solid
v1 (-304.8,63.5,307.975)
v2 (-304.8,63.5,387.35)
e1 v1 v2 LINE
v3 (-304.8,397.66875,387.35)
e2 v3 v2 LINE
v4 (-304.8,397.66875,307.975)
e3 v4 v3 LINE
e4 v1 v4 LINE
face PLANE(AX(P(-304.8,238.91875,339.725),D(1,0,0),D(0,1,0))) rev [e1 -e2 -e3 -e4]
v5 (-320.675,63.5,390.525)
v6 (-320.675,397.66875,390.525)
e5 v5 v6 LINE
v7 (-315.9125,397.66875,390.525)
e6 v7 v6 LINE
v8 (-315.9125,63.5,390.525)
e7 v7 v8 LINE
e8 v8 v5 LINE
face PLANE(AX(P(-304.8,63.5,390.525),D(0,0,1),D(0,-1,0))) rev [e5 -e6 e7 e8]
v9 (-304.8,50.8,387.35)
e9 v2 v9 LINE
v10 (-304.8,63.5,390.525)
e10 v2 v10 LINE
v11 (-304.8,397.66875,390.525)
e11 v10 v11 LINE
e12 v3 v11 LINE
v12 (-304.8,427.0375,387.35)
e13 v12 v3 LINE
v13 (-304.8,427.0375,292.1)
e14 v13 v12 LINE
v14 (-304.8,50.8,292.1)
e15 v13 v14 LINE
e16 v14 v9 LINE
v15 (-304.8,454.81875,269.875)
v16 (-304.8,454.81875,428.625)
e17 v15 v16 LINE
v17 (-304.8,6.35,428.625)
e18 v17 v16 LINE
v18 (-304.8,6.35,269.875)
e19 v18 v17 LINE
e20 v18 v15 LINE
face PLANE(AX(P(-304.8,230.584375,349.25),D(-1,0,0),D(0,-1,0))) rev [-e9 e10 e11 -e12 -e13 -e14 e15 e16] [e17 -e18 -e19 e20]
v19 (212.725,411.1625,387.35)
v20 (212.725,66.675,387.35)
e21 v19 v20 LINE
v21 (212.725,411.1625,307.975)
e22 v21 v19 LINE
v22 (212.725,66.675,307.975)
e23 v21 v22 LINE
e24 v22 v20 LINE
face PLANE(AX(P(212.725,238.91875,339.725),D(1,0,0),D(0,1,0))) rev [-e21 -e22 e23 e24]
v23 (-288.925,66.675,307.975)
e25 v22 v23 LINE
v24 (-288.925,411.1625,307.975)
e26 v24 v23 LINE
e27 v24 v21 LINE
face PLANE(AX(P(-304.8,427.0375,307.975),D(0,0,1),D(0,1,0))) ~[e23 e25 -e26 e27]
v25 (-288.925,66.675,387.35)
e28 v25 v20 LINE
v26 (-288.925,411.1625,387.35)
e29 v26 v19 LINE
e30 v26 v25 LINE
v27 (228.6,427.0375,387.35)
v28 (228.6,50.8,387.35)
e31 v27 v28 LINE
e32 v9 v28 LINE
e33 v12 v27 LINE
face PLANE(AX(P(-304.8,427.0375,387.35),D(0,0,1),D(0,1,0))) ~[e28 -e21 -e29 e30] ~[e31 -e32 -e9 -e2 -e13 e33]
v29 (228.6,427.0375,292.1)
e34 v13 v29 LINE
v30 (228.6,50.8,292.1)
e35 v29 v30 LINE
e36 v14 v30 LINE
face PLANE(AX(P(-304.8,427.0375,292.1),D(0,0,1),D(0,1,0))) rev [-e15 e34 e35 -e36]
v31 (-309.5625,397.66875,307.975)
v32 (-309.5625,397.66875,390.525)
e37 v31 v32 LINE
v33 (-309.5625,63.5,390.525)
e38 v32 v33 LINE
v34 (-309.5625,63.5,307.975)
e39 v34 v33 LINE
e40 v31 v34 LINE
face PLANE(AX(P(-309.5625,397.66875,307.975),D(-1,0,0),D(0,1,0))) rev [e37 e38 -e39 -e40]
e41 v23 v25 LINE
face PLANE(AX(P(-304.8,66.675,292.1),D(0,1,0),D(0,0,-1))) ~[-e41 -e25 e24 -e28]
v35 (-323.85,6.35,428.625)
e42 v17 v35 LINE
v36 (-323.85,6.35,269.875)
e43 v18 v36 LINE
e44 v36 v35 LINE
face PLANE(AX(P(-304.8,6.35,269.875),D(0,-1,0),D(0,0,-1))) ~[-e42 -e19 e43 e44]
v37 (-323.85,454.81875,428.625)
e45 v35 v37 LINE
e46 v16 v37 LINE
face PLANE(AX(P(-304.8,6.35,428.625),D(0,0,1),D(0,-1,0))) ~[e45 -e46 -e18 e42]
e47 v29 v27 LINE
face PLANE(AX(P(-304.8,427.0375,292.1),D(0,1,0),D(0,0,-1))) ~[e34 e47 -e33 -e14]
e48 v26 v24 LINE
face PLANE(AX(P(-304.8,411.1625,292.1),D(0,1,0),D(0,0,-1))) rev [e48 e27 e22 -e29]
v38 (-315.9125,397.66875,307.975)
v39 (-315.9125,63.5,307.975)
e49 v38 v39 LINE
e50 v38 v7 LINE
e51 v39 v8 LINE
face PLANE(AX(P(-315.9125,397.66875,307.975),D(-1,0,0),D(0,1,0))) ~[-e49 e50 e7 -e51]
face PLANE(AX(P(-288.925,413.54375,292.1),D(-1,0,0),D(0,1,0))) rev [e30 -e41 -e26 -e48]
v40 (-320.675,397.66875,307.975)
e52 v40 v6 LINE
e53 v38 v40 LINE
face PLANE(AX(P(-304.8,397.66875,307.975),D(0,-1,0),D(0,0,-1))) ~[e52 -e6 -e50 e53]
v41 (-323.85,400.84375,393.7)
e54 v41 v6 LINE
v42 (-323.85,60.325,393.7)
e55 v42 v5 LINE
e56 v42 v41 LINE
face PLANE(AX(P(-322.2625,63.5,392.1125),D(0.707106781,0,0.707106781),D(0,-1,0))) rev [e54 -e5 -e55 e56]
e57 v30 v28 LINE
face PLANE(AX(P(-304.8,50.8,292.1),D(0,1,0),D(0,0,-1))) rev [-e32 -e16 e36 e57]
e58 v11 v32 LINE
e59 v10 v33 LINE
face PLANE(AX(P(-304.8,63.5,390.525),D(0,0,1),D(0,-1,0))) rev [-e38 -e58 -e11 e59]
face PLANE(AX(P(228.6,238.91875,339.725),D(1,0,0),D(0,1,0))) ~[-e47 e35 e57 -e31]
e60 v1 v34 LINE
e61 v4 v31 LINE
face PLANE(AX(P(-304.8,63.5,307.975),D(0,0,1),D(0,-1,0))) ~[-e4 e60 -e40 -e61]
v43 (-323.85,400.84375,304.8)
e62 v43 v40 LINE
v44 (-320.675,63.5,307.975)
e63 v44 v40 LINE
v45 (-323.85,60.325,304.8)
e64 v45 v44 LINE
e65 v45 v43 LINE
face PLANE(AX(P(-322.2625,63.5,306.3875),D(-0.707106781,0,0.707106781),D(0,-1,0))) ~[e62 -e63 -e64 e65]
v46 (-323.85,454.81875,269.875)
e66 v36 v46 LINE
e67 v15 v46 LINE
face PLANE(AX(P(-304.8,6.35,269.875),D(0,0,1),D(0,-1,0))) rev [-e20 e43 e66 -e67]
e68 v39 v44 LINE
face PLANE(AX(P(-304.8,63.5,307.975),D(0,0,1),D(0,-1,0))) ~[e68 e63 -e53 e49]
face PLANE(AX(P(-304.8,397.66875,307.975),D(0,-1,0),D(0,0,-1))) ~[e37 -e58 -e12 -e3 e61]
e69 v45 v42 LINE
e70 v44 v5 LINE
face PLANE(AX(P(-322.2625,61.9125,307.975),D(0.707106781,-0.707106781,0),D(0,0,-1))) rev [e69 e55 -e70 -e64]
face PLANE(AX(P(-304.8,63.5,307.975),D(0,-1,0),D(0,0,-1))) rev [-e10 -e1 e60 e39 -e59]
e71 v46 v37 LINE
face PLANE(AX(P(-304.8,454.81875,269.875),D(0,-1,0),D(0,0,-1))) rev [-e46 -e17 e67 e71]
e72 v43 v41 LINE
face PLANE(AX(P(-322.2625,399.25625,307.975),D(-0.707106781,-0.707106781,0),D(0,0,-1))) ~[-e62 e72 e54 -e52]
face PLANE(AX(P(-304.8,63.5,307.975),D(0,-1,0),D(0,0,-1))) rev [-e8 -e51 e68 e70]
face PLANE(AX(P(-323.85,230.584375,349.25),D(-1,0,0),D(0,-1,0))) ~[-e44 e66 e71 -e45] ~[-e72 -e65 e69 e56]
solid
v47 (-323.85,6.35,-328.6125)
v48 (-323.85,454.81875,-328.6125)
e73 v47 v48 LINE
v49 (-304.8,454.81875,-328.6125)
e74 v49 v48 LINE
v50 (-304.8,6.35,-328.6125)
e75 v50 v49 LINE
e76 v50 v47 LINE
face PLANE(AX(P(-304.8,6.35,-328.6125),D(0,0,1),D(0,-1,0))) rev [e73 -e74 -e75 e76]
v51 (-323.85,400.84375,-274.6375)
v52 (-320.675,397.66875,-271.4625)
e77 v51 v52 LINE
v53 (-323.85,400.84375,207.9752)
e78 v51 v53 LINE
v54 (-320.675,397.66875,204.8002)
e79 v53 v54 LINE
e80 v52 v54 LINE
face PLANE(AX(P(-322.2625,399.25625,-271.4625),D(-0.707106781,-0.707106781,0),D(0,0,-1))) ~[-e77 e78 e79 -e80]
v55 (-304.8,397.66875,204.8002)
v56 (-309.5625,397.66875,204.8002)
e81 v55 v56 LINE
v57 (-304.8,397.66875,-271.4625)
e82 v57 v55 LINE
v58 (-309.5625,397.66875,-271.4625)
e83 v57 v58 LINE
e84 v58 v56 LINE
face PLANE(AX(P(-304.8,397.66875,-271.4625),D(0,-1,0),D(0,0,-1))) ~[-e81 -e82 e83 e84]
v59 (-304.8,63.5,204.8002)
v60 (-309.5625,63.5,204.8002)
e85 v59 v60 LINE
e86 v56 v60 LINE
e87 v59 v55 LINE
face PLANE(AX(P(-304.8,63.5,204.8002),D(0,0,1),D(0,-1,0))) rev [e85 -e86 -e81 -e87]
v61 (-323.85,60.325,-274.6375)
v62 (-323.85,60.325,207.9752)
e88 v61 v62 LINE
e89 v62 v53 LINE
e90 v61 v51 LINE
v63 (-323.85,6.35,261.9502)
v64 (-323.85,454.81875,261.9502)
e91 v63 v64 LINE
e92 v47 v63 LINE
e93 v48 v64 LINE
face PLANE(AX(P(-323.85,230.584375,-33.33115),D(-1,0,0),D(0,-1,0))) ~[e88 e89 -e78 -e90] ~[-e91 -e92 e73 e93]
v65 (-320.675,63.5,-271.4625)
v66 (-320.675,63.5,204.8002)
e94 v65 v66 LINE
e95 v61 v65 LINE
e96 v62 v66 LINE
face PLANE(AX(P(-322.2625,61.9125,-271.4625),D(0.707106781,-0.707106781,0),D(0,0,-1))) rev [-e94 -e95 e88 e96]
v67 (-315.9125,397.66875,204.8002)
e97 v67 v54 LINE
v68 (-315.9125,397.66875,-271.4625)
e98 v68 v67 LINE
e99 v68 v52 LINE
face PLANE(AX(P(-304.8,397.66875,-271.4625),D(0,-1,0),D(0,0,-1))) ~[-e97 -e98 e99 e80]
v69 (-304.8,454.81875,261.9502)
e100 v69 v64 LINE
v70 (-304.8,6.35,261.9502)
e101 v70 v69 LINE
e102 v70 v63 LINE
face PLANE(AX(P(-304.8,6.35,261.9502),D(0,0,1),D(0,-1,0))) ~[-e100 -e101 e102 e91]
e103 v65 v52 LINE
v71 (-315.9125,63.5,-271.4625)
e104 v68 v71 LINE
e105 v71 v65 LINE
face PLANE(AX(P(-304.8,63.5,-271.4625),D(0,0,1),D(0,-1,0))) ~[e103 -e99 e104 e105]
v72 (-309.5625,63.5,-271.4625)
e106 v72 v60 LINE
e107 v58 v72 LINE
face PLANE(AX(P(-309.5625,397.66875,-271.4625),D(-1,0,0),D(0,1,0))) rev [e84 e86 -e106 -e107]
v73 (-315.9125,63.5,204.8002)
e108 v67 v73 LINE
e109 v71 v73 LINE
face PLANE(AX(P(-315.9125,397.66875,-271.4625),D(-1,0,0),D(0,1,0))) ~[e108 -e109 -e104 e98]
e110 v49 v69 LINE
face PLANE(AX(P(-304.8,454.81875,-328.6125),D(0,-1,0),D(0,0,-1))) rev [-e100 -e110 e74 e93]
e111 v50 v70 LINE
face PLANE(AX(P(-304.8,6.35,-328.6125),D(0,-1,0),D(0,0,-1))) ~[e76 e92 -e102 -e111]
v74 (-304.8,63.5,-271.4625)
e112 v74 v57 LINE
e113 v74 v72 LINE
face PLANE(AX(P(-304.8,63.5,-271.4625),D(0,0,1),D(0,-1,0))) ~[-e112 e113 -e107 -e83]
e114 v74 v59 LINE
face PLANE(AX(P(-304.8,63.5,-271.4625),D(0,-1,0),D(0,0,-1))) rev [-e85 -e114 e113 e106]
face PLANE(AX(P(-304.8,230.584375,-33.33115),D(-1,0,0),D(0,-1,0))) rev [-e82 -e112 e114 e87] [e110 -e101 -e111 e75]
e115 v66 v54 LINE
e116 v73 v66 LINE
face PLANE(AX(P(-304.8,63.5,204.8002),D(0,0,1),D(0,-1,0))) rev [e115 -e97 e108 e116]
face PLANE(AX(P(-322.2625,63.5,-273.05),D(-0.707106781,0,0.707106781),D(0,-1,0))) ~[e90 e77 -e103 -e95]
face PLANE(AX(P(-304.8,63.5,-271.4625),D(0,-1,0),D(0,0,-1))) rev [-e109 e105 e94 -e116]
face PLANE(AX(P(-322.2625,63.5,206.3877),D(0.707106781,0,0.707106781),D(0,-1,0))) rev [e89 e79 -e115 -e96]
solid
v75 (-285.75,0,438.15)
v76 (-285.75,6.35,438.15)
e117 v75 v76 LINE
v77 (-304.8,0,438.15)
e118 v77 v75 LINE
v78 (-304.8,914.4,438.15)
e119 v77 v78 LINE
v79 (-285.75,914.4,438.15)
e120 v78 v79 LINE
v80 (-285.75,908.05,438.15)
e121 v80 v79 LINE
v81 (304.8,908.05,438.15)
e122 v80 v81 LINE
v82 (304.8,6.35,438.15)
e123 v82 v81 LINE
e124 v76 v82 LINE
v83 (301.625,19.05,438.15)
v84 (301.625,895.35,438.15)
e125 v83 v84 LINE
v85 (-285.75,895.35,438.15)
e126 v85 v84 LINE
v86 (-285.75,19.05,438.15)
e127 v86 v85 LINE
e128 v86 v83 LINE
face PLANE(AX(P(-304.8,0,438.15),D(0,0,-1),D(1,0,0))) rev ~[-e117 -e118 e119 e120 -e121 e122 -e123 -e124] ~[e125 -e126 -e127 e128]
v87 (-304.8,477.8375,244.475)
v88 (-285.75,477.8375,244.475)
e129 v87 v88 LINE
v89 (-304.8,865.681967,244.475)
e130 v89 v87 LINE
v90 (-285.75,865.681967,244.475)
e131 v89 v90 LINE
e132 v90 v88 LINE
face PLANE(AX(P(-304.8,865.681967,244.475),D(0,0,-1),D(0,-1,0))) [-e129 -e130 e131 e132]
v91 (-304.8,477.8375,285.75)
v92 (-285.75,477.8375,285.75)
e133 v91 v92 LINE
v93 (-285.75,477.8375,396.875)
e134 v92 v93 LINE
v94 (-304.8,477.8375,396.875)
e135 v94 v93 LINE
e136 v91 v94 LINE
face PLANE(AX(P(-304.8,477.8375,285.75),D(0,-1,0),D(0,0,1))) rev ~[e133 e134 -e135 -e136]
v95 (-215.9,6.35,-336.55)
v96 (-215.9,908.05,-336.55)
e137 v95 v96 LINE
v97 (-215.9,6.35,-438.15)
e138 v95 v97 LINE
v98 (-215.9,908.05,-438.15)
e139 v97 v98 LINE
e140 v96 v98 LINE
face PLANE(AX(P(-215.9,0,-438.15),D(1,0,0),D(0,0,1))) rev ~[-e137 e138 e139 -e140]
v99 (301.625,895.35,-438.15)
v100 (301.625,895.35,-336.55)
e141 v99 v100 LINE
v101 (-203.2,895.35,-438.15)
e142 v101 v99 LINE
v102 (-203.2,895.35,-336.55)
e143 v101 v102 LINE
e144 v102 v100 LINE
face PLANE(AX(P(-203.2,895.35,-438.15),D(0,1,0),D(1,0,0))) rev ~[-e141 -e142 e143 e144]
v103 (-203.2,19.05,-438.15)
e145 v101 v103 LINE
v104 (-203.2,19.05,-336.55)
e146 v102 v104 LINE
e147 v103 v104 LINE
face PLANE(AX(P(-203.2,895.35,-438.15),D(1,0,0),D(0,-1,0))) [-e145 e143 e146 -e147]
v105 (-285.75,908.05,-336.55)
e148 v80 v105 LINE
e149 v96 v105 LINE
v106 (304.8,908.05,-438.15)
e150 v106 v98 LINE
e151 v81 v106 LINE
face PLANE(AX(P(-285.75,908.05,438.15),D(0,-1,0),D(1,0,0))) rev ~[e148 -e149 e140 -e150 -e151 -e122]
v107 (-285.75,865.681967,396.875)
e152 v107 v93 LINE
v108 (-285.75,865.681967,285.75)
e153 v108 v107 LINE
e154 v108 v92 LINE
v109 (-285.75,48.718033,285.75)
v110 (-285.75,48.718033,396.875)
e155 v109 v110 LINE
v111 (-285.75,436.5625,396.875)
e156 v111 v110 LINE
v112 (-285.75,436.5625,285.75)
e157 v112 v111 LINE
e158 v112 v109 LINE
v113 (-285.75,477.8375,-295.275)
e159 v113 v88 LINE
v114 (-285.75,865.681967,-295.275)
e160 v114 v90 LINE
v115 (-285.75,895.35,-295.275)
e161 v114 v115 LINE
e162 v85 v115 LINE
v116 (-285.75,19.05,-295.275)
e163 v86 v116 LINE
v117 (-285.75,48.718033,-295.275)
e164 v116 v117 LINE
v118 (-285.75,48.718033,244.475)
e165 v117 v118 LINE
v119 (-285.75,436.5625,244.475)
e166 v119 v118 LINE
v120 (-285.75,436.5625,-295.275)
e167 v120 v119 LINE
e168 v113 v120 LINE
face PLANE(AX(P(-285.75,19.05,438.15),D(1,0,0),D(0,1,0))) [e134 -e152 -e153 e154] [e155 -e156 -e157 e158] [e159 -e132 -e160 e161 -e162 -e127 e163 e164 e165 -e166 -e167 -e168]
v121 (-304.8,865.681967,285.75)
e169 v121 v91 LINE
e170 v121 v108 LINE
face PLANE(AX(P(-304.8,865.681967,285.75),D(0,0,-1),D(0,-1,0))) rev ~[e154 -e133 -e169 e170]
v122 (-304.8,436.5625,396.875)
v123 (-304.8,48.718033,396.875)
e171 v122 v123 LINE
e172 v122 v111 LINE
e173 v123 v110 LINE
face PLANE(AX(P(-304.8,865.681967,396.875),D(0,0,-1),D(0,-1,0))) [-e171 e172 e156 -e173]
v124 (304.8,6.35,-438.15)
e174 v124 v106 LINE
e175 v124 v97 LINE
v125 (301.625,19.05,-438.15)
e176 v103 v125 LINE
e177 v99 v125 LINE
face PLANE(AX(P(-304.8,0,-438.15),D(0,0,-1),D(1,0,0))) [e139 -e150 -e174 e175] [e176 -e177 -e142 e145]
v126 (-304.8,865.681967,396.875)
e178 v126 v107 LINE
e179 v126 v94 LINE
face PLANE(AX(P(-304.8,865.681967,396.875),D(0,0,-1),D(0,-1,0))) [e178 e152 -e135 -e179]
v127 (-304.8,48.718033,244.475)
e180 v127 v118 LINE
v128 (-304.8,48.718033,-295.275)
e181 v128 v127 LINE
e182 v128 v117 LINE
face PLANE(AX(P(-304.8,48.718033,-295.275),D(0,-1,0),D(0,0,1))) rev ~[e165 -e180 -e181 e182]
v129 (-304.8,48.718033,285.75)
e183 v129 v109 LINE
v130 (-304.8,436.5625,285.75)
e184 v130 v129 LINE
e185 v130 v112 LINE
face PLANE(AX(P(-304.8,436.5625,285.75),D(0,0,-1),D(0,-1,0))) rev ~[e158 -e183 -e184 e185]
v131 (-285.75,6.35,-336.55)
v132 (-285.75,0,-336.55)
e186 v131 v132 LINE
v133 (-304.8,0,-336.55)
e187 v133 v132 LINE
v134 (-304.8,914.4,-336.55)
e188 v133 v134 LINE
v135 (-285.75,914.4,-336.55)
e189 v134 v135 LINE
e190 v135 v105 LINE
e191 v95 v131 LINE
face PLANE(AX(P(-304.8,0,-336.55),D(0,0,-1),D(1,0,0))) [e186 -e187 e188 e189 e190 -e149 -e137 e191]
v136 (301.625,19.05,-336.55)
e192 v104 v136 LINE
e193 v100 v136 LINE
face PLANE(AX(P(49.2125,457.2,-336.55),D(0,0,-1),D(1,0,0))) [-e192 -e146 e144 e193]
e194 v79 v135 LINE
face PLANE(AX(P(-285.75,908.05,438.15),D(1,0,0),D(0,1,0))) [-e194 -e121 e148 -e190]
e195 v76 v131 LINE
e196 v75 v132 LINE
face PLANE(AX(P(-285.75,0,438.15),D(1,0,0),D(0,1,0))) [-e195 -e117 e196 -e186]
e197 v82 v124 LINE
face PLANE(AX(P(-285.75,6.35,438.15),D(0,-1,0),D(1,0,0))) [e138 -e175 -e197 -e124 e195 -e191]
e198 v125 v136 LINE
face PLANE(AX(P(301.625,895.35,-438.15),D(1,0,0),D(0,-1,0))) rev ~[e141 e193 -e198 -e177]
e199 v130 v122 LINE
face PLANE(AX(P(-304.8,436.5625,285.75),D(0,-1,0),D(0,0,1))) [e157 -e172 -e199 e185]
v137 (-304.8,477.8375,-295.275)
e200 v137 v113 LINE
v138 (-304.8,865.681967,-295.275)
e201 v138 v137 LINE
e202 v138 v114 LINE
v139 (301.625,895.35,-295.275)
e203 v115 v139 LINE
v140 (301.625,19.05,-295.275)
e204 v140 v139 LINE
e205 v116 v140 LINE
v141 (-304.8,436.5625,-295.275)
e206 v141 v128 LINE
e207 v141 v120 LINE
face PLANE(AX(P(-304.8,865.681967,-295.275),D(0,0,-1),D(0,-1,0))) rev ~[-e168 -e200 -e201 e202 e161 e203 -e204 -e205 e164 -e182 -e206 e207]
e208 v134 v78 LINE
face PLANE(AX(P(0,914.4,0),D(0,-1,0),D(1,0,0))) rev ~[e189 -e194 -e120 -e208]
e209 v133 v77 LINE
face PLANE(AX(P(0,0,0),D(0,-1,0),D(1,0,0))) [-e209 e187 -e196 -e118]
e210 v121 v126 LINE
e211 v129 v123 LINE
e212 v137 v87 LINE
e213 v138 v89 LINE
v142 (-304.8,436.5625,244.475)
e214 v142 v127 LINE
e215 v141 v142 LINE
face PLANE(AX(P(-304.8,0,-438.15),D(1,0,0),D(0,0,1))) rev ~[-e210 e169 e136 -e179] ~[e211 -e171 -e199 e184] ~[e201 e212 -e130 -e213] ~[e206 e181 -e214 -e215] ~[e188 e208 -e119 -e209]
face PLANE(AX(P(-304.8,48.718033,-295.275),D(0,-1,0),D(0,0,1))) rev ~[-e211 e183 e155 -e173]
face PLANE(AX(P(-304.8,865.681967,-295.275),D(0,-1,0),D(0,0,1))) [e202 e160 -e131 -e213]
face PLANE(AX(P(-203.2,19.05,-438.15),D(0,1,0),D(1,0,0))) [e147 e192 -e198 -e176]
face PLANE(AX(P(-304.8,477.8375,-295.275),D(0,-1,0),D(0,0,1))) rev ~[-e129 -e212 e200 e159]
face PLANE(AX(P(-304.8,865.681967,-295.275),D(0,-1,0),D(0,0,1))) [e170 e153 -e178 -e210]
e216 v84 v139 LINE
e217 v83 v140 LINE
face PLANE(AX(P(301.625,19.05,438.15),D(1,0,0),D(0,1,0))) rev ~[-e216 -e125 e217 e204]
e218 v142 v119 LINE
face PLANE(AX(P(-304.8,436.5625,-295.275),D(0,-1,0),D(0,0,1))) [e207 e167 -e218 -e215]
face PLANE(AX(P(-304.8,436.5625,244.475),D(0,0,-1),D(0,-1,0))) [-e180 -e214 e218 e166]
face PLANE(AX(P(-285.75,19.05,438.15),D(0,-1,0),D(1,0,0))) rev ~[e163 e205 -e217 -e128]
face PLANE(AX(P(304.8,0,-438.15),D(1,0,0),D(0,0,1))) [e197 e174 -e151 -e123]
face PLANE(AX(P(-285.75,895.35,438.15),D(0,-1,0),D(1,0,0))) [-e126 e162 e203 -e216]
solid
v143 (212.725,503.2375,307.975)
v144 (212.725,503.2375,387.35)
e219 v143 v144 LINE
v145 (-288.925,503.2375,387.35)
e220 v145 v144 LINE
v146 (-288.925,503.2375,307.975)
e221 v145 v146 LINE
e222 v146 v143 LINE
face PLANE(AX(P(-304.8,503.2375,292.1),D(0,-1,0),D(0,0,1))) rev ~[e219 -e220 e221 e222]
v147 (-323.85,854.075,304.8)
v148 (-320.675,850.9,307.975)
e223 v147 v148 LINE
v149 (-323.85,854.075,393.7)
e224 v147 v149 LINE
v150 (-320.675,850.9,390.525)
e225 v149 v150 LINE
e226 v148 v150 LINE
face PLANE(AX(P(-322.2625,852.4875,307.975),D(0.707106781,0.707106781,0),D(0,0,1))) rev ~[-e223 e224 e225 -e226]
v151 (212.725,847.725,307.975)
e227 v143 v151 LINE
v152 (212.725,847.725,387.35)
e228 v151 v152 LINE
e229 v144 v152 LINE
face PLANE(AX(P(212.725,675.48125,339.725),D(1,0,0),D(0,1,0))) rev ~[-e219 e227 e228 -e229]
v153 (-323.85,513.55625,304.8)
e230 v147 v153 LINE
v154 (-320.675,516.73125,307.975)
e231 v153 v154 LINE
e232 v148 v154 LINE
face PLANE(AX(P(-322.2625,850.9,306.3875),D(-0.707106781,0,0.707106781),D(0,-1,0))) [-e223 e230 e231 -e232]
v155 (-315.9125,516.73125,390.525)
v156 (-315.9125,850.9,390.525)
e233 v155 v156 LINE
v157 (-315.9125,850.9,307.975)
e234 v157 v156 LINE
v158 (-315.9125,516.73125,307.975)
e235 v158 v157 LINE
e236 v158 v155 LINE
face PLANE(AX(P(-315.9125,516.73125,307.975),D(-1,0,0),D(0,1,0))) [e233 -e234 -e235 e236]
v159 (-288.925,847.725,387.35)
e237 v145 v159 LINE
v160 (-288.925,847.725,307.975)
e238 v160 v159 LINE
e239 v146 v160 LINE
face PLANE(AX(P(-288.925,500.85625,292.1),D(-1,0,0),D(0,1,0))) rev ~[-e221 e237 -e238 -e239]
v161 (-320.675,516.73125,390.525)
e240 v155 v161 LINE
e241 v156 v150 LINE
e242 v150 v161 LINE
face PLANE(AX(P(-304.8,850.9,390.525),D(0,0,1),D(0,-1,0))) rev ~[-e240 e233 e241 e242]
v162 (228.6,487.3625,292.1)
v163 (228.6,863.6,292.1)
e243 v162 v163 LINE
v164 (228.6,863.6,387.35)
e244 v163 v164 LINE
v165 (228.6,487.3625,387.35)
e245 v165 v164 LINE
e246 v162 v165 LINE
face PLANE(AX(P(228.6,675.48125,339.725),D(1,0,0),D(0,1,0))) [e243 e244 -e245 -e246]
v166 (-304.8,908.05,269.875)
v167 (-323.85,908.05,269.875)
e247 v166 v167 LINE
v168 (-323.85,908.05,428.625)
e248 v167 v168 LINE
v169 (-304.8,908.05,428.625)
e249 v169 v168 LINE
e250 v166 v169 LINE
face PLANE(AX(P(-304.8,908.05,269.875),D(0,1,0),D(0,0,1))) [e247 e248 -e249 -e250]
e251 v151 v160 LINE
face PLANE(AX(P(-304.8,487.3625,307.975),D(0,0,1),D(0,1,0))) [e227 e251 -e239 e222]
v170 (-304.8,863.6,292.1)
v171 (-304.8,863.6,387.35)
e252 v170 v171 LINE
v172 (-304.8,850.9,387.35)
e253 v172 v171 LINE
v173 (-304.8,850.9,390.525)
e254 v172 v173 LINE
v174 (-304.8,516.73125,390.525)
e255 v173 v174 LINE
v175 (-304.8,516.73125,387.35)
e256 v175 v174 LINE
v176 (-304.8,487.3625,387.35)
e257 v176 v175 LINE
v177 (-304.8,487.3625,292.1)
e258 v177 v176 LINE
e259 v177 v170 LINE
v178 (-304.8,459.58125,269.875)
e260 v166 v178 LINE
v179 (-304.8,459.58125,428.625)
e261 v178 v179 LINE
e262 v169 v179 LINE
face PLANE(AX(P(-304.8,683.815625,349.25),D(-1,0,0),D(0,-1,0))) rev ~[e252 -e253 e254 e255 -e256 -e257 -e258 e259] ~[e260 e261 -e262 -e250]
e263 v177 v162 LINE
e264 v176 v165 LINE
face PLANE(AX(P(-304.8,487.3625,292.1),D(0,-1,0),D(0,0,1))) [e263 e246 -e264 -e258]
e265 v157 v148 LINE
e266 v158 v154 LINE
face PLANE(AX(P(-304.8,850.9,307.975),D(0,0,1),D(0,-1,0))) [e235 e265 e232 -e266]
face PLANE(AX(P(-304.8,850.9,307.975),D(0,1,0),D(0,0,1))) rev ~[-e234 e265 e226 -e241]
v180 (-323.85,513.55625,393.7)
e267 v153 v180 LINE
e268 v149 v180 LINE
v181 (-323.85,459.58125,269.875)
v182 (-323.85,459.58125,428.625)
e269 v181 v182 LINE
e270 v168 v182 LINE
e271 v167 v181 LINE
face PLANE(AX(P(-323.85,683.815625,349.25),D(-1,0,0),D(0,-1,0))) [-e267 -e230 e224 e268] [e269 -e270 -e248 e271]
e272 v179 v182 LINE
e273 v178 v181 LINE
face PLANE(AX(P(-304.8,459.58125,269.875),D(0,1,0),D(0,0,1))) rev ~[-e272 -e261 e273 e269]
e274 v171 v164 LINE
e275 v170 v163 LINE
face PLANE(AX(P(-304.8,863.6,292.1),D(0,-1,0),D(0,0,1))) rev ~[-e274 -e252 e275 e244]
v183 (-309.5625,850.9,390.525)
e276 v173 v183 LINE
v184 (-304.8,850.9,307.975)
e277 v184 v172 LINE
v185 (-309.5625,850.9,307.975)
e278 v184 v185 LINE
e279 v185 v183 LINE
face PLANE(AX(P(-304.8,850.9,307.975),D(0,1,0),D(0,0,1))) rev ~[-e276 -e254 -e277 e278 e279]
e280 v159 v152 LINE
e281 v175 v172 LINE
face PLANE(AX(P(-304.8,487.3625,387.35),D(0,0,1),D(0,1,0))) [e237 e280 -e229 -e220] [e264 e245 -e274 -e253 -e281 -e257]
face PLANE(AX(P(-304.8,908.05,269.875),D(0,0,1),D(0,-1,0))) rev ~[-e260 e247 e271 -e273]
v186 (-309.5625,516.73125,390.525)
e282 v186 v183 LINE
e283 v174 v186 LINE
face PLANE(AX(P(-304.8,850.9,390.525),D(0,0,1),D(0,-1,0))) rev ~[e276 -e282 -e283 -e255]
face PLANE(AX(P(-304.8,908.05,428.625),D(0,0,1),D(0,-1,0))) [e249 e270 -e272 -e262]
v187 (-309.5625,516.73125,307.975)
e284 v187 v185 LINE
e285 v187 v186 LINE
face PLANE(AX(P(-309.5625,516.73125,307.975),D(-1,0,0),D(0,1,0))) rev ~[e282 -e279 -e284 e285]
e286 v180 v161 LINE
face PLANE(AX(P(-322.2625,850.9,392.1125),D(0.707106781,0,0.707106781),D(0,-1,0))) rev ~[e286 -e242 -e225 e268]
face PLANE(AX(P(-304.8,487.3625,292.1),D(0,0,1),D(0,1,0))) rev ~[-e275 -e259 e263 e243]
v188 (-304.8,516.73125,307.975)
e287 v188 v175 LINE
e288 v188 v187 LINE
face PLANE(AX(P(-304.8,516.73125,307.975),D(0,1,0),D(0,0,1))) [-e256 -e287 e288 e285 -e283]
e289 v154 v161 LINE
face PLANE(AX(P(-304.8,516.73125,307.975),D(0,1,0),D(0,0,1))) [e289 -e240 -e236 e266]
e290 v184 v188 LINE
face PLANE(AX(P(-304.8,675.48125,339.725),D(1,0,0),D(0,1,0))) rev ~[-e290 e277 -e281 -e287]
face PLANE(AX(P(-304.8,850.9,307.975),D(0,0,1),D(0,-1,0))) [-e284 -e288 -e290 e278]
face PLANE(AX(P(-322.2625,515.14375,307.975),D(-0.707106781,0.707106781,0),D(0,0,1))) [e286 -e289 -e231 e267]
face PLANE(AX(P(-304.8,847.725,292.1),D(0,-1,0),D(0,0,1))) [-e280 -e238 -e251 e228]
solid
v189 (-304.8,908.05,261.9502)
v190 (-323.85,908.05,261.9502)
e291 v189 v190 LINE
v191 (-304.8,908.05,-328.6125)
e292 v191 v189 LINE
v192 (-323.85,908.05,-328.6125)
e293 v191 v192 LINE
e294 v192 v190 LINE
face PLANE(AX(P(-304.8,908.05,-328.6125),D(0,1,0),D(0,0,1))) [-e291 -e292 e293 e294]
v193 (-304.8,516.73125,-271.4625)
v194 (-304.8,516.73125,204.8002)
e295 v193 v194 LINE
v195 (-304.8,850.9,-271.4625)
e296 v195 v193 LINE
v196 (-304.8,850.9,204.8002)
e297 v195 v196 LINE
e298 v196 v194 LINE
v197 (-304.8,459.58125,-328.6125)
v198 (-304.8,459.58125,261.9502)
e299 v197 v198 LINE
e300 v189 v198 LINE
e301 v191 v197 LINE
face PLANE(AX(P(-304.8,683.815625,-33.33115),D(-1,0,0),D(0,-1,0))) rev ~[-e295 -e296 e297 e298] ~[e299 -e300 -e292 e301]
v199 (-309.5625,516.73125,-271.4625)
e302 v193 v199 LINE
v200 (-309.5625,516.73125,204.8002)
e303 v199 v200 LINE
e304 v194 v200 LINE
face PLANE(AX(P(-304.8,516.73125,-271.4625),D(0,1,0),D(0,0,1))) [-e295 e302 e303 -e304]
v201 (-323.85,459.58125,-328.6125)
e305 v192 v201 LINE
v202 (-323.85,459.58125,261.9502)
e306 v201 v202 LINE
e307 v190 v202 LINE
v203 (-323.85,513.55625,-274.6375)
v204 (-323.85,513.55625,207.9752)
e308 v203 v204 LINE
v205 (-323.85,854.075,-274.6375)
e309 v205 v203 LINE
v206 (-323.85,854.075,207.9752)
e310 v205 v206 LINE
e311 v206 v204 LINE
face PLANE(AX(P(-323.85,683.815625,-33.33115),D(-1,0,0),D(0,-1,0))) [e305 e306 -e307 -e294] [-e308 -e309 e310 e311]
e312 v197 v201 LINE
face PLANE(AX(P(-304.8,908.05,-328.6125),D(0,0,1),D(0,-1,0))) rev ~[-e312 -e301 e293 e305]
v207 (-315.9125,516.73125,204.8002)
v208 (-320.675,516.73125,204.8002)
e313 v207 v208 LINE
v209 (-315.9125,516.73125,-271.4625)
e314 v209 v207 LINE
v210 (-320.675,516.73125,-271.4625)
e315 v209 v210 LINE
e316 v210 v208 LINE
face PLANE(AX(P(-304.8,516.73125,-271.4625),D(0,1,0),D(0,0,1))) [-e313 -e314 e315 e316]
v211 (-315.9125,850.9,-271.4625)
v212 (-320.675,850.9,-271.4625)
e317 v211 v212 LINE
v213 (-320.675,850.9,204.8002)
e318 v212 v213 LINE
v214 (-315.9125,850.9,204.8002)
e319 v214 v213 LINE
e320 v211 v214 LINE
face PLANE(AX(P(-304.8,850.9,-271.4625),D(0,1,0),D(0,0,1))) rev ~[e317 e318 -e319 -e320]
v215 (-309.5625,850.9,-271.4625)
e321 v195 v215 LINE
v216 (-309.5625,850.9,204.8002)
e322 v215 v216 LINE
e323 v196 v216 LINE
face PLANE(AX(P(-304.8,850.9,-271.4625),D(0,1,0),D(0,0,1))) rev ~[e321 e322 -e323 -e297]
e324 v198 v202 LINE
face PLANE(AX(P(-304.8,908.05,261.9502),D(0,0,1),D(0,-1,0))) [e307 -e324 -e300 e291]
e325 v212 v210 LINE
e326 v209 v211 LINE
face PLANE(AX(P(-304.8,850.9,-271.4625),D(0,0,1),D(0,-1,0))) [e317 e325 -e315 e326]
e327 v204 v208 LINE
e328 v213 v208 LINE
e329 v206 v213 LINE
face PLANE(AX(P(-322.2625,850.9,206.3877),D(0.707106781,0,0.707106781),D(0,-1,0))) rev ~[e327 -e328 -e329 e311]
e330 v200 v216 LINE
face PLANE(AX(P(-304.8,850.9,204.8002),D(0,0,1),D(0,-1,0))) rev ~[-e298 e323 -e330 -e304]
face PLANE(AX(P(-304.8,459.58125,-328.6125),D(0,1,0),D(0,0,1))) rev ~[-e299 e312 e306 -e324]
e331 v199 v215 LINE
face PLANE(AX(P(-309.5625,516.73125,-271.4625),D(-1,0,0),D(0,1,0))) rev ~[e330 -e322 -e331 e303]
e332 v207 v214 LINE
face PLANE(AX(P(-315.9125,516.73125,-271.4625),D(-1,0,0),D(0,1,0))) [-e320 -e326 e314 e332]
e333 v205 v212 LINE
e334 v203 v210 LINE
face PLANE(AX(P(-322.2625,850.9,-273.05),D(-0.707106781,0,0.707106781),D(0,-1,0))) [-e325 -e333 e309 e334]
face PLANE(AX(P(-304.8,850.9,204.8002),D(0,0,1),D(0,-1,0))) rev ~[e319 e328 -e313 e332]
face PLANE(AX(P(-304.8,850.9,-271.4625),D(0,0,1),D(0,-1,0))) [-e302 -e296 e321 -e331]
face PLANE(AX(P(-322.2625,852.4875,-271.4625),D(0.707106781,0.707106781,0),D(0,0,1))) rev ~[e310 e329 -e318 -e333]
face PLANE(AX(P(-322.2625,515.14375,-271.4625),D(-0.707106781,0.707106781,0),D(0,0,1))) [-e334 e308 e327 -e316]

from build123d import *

# Parameters (mm, degrees)
F0_W          = 609.6
F0_H          = 876.3
F1_DEPTH      = 914.4
F2_W          = 88.9
F2_H          = 101.6
F3_DEPTH      = 914.401
F4_W          = 816.9639344262
F4_H          = 692.15
F5_DEPTH      = 19.05
F6_W          = 590.55
F6_H          = 6.35
F7_DEPTH      = 876.301
F8_W          = 587.375
F8_H          = 876.3
F9_DEPTH      = 733.425
F10_W         = 387.8444672131
F10_H         = 41.275
F10_W_2       = 41.275
F10_H_2       = 111.125
F10_H_3       = 539.75
F11_DEPTH     = 19.05
F12_W         = 448.46875
F12_H         = 590.5627
F12_W_2       = 334.16875
F12_H_2       = 476.2627
F13_DEPTH     = 19.05
F14_W         = 6.35
F14_H         = 334.16875
F15_DEPTH     = 476.2627
F16_SIZE      = 3.175
F17_W         = 448.46875
F17_H         = 158.75
F17_W_2       = 334.16875
F17_H_2       = 82.55
F18_DEPTH     = 19.05
F19_W         = 6.35
F19_H         = 334.16875
F20_DEPTH     = 82.55
F21_SIZE      = 3.175
F22_W         = 504.825
F22_H         = 876.3
F23_DEPTH     = 101.6
F24_W         = 376.2375
F24_H         = 95.25
F25_DEPTH     = 533.4
F26_T         = 15.875
F26_T3_DEPTH  = 37.249261314
F26_T5_DEPTH  = 37.249261314
F26_T7_DEPTH  = 37.249261314
F26_T9_DEPTH  = 37.249261314
F26_T11_DEPTH = 36.5125
F26_T13_DEPTH = 365.91875
F26_T15_DEPTH = 114.3
F26_T17_DEPTH = 127
F26_T19_DEPTH = 407.9875
F26_T21_DEPTH = 111.125
F26_T23_DEPTH = 36.5125


# Not quite as in the source:
# - a shell that OpenCascade refuses in one call is made with other operations: the cavity is built on its own and cut out


with BuildPart() as f1:
    # F0 (on Front) → F1 (new body)
    with BuildSketch(Plane.XZ):
        Rectangle(F0_W, F0_H)
    extrude(amount=-F1_DEPTH)

    # F2 (on face) → F3 (cut, through all)
    with BuildSketch(Plane.XZ):
        with Locations((-260.35, -387.35)):
            Rectangle(F2_W, F2_H)
    extrude(amount=-F3_DEPTH, mode=Mode.SUBTRACT)

    # F4 (on face) → F5 (cut)
    with BuildSketch(Plane(origin=(-304.8, 0, 0), x_dir=(0, -1, 0), z_dir=(-1, 0, 0))):
        with Locations((-457.2, 50.8)):
            Rectangle(F4_W, F4_H)
    extrude(amount=-F5_DEPTH, mode=Mode.SUBTRACT)

    # F6 (on face) → F7 (cut, through all)
    with BuildSketch(Plane.XY.offset(438.15)):
        with Locations((9.525, 911.225)):
            Rectangle(F6_W, F6_H)
        with Locations((9.525, 3.175)):
            Rectangle(F6_W, F6_H)
    extrude(amount=-F7_DEPTH, mode=Mode.SUBTRACT)

    # F8 (on face) → F9 (cut, through all)
    with BuildSketch(Plane.XY.offset(438.15)):
        with Locations((7.9375, 457.2)):
            Rectangle(F8_W, F8_H)
    extrude(amount=-F9_DEPTH, mode=Mode.SUBTRACT)

    # F10 (on face) → F11 (join, through all)
    with BuildSketch(Plane(origin=(-304.8, 0, 0), x_dir=(0, -1, 0), z_dir=(-1, 0, 0))):
        with Locations((-671.7597336066, 265.1125)):
            Rectangle(F10_W, F10_H)
        with Locations((-457.2, 341.3125)):
            Rectangle(F10_W_2, F10_H_2)
        with Locations((-457.2, 265.1125)):
            Rectangle(F10_W_2, F10_H)
        with Locations((-242.6402663934, 265.1125)):
            Rectangle(F10_W, F10_H)
        with Locations((-457.2, -25.4)):
            Rectangle(F10_W_2, F10_H_3)
    extrude(amount=-F11_DEPTH)

    # F22 (on face) → F23 (cut)
    with BuildSketch(Plane(origin=(0, 0, -438.15), x_dir=(1, 0, 0), z_dir=(0, 0, -1))):
        with Locations((49.2125, -457.2)):
            Rectangle(F22_W, F22_H)
    extrude(amount=-F23_DEPTH, mode=Mode.SUBTRACT)


with BuildPart() as f13:
    # F12 (on face) → F13 (new body)
    with BuildSketch(Plane(origin=(-304.8, 0, 0), x_dir=(0, -1, 0), z_dir=(-1, 0, 0))):
        with Locations((-683.815625, -33.33115)):
            Rectangle(F12_W, F12_H)
        with Locations((-683.815625, -33.33115)):
            Rectangle(F12_W_2, F12_H_2, mode=Mode.SUBTRACT)
    extrude(amount=F13_DEPTH)

    # F14 (on face) → F15 (join, through all)
    with BuildSketch(Plane.XY.offset(-271.4625)):
        with Locations((-312.7375, 683.815625)):
            Rectangle(F14_W, F14_H)
    extrude(amount=F15_DEPTH)

    # F16
    f16_edges = [f13.edges().sort_by_distance(p)[0] for p in [
        (-323.85, 850.9, -33.33115),
        (-323.85, 683.815625, -271.4625),
        (-323.85, 516.73125, -33.33115),
        (-323.85, 683.815625, 204.8002),
    ]]
    chamfer(f16_edges, length=F16_SIZE)


with BuildPart() as f18:
    # F17 (on face) → F18 (new body)
    with BuildSketch(Plane(origin=(-304.8, 0, 0), x_dir=(0, -1, 0), z_dir=(-1, 0, 0))):
        with Locations((-683.815625, 349.25)):
            Rectangle(F17_W, F17_H)
        with Locations((-683.815625, 349.25)):
            Rectangle(F17_W_2, F17_H_2, mode=Mode.SUBTRACT)
    extrude(amount=F18_DEPTH)

    # F19 (on face) → F20 (join, through all)
    with BuildSketch(Plane.XY.offset(307.975)):
        with Locations((-312.7375, 683.815625)):
            Rectangle(F19_W, F19_H)
    extrude(amount=F20_DEPTH)

    # F21
    f21_edges = [f18.edges().sort_by_distance(p)[0] for p in [
        (-323.85, 683.815625, 307.975),
        (-323.85, 850.9, 349.25),
        (-323.85, 683.815625, 390.525),
        (-323.85, 516.73125, 349.25),
    ]]
    chamfer(f21_edges, length=F21_SIZE)

    # F24 (on face) → F25 (join)
    with BuildSketch(Plane.YZ.offset(-304.8)):
        with Locations((675.48125, 339.725)):
            Rectangle(F24_W, F24_H)
    extrude(amount=F25_DEPTH)

    # F26: shell of thickness 15.875, made by hand


with BuildPart() as f26_core1:
    # F26_t2: copy of F18
    add(f18.part)

    # the walls: a layer under each face that stays
    f26_faces = [f26_core1.faces().sort_by_distance(p)[0] for p in [
        (-323.85, 833.3052083333, 296.3333333333),
        (-322.2625, 683.815625, 306.3875),
        (-322.2625, 515.14375, 349.25),
        (-322.2625, 852.4875, 349.25),
        (-322.2625, 683.815625, 392.1125),
        (-314.325, 683.815625, 428.625),
        (-314.325, 908.05, 349.25),
        (-314.325, 683.815625, 269.875),
        (-314.325, 459.58125, 349.25),
        (-318.29375, 683.815625, 307.975),
        (-318.29375, 516.73125, 349.25),
        (-318.29375, 850.9, 349.25),
        (-318.29375, 683.815625, 390.525),
        (-304.8, 833.3052083333, 402.1666666667),
        (-315.9125, 683.815625, 349.25),
        (-38.1, 863.6, 339.725),
        (-38.1, 675.48125, 292.1),
        (-38.1, 487.3625, 339.725),
        (-307.18125, 516.73125, 349.25),
        (-307.18125, 683.815625, 390.525),
        (-307.18125, 850.9, 349.25),
        (-304.8, 683.815625, 347.6625),
        (228.6, 675.48125, 339.725),
        (-307.18125, 683.815625, 307.975),
        (-309.5625, 683.815625, 349.25),
    ]]
    thicken(f26_faces, amount=-F26_T, mode=Mode.SUBTRACT)

    # F26_s4 → F26_t3 (cut)
    with BuildSketch(Plane(origin=(155.6699811433, 155.6699811433, 155.6699811433), x_dir=(-0.7071067812, 0.7071067812, 0), z_dir=(0.5773502692, 0.5773502692, 0.5773502692))):
        Polygon((592.373762983, 171.5583871468), (584.198137983, 157.6727523289), (576.260637983, 162.2554700906), (576.260637983, 171.420905614), align=None)
    extrude(amount=F26_T3_DEPTH, mode=Mode.SUBTRACT)

    # F26_s6 → F26_t5 (cut)
    with BuildSketch(Plane(origin=(-300.2071021901, 300.20710219, -300.2071021901), x_dir=(0.7071067812, 0.7071067812, 0), z_dir=(0.5773502692, -0.5773502692, 0.5773502692))):
        Polygon((374.6875680546, 729.8915069443), (382.8631930546, 716.0058721263), (390.8006930546, 720.588589888), (390.8006930546, 729.7540254114), align=None)
    extrude(amount=F26_T5_DEPTH, mode=Mode.SUBTRACT)

    # F26_s8 → F26_t7 (cut)
    with BuildSketch(Plane(origin=(-77.1633521901, -77.1633521901, 77.1633521901), x_dir=(-0.7071067812, 0.7071067812, 0), z_dir=(0.5773502692, 0.5773502692, -0.5773502692))):
        Polygon((592.373762983, 398.7644746312), (576.260637983, 398.9019561641), (576.260637983, 408.0673916874), (584.198137983, 412.6501094491), align=None)
    extrude(amount=F26_T7_DEPTH, mode=Mode.SUBTRACT)

    # F26_s10 → F26_t9 (cut)
    with BuildSketch(Plane(origin=(-533.0404355234, 533.0404355234, 533.0404355234), x_dir=(0.7071067812, 0.7071067812, 0), z_dir=(0.5773502692, -0.5773502692, -0.5773502692))):
        Polygon((374.6875680546, -159.5686451663), (390.8006930546, -159.4311636334), (390.8006930546, -150.26572811), (382.8631930546, -145.6830103483), align=None)
    extrude(amount=F26_T9_DEPTH, mode=Mode.SUBTRACT)

    # F26_s12 → F26_t11 (cut)
    with BuildSketch(Plane.YZ.offset(-336.55)):
        Polygon((850.74125, 308.13375), (850.9, 292.1), (866.775, 292.1), (866.775, 307.975), align=None)
        Polygon((516.89, 308.13375), (516.73125, 292.1), (500.85625, 292.1), (500.85625, 307.975), align=None)
        Polygon((516.89, 390.36625), (500.85625, 390.525), (500.85625, 406.4), (516.73125, 406.4), align=None)
        Polygon((850.74125, 390.36625), (866.775, 390.525), (866.775, 406.4), (850.9, 406.4), align=None)
    extrude(amount=F26_T11_DEPTH, mode=Mode.SUBTRACT)

    # F26_s14 → F26_t13 (cut)
    with BuildSketch(Plane.XZ.offset(-866.775)):
        Polygon((-316.07125, 308.13375), (-315.9125, 292.1), (-300.0375, 292.1), (-300.0375, 307.975), align=None)
        Polygon((-316.07125, 390.36625), (-315.9125, 406.4), (-300.0375, 406.4), (-300.0375, 390.525), align=None)
        Polygon((-309.40375, 390.36625), (-309.5625, 406.4), (-325.4375, 406.4), (-325.4375, 390.525), align=None)
        Polygon((-304.95875, 308.13375), (-288.925, 307.975), (-288.925, 292.1), (-304.8, 292.1), align=None)
        Polygon((-309.40375, 308.13375), (-309.5625, 292.1), (-325.4375, 292.1), (-325.4375, 307.975), align=None)
    extrude(amount=F26_T13_DEPTH, mode=Mode.SUBTRACT)

    # F26_s16 → F26_t15 (cut)
    with BuildSketch(Plane.XY.offset(292.1)):
        Polygon((-316.07125, 516.89), (-315.9125, 500.85625), (-300.0375, 500.85625), (-300.0375, 516.73125), align=None)
        Polygon((-316.07125, 850.74125), (-315.9125, 866.775), (-300.0375, 866.775), (-300.0375, 850.9), align=None)
        Polygon((-309.40375, 516.89), (-309.5625, 500.85625), (-325.4375, 500.85625), (-325.4375, 516.73125), align=None)
        Polygon((-309.40375, 850.74125), (-309.5625, 866.775), (-325.4375, 866.775), (-325.4375, 850.9), align=None)
    extrude(amount=F26_T15_DEPTH, mode=Mode.SUBTRACT)

    # F26_s18 → F26_t17 (cut)
    with BuildSketch(Plane.XY.offset(276.225)):
        Polygon((-304.64125, 863.75875), (-320.675, 863.6), (-320.675, 847.725), (-304.8, 847.725), align=None)
        Polygon((-304.64125, 487.20375), (-320.675, 487.3625), (-320.675, 503.2375), (-304.8, 503.2375), align=None)
    extrude(amount=F26_T17_DEPTH, mode=Mode.SUBTRACT)

    # F26_s20 → F26_t19 (cut)
    with BuildSketch(Plane.XZ.offset(-879.475)):
        Polygon((-304.64125, 291.94125), (-320.675, 292.1), (-320.675, 307.975), (-304.8, 307.975), align=None)
    extrude(amount=F26_T19_DEPTH, mode=Mode.SUBTRACT)

    # F26_s22 → F26_t21 (cut)
    with BuildSketch(Plane.XY.offset(292.1)):
        Polygon((-304.95875, 516.89), (-304.8, 500.85625), (-288.925, 500.85625), (-288.925, 516.73125), align=None)
        Polygon((-304.95875, 850.74125), (-304.8, 866.775), (-288.925, 866.775), (-288.925, 850.9), align=None)
    extrude(amount=F26_T21_DEPTH, mode=Mode.SUBTRACT)

    # F26_s24 → F26_t23 (cut)
    with BuildSketch(Plane.YZ.offset(-325.4375)):
        Polygon((516.89, 308.13375), (500.85625, 307.975), (500.85625, 292.1), (516.73125, 292.1), align=None)
        Polygon((516.89, 390.36625), (500.85625, 390.525), (500.85625, 406.4), (516.73125, 406.4), align=None)
        Polygon((850.74125, 390.36625), (850.9, 406.4), (866.775, 406.4), (866.775, 390.525), align=None)
        Polygon((850.74125, 308.13375), (866.775, 307.975), (866.775, 292.1), (850.9, 292.1), align=None)
    extrude(amount=F26_T23_DEPTH, mode=Mode.SUBTRACT)


with BuildPart() as f18_1:
    add(f18.part)

    # what is left inside the walls is the cavity
    f26_cavity = [f26_core1.part.solids().sort_by_distance(p)[0] for p in [
        (45.508333, 675.48125, 308.13375),
    ]]
    add(f26_cavity, mode=Mode.SUBTRACT)


with BuildPart() as f28_1:
    # F28: instance of F18
    add(f18_1.part.mirror(Plane.XZ.offset(-457.2)))


with BuildPart() as f29_1:
    # F29: instance of F13
    add(f13.part.mirror(Plane.XZ.offset(-457.2)))


solid = Compound([f1.part, f13.part, f18_1.part, f28_1.part, f29_1.part])
